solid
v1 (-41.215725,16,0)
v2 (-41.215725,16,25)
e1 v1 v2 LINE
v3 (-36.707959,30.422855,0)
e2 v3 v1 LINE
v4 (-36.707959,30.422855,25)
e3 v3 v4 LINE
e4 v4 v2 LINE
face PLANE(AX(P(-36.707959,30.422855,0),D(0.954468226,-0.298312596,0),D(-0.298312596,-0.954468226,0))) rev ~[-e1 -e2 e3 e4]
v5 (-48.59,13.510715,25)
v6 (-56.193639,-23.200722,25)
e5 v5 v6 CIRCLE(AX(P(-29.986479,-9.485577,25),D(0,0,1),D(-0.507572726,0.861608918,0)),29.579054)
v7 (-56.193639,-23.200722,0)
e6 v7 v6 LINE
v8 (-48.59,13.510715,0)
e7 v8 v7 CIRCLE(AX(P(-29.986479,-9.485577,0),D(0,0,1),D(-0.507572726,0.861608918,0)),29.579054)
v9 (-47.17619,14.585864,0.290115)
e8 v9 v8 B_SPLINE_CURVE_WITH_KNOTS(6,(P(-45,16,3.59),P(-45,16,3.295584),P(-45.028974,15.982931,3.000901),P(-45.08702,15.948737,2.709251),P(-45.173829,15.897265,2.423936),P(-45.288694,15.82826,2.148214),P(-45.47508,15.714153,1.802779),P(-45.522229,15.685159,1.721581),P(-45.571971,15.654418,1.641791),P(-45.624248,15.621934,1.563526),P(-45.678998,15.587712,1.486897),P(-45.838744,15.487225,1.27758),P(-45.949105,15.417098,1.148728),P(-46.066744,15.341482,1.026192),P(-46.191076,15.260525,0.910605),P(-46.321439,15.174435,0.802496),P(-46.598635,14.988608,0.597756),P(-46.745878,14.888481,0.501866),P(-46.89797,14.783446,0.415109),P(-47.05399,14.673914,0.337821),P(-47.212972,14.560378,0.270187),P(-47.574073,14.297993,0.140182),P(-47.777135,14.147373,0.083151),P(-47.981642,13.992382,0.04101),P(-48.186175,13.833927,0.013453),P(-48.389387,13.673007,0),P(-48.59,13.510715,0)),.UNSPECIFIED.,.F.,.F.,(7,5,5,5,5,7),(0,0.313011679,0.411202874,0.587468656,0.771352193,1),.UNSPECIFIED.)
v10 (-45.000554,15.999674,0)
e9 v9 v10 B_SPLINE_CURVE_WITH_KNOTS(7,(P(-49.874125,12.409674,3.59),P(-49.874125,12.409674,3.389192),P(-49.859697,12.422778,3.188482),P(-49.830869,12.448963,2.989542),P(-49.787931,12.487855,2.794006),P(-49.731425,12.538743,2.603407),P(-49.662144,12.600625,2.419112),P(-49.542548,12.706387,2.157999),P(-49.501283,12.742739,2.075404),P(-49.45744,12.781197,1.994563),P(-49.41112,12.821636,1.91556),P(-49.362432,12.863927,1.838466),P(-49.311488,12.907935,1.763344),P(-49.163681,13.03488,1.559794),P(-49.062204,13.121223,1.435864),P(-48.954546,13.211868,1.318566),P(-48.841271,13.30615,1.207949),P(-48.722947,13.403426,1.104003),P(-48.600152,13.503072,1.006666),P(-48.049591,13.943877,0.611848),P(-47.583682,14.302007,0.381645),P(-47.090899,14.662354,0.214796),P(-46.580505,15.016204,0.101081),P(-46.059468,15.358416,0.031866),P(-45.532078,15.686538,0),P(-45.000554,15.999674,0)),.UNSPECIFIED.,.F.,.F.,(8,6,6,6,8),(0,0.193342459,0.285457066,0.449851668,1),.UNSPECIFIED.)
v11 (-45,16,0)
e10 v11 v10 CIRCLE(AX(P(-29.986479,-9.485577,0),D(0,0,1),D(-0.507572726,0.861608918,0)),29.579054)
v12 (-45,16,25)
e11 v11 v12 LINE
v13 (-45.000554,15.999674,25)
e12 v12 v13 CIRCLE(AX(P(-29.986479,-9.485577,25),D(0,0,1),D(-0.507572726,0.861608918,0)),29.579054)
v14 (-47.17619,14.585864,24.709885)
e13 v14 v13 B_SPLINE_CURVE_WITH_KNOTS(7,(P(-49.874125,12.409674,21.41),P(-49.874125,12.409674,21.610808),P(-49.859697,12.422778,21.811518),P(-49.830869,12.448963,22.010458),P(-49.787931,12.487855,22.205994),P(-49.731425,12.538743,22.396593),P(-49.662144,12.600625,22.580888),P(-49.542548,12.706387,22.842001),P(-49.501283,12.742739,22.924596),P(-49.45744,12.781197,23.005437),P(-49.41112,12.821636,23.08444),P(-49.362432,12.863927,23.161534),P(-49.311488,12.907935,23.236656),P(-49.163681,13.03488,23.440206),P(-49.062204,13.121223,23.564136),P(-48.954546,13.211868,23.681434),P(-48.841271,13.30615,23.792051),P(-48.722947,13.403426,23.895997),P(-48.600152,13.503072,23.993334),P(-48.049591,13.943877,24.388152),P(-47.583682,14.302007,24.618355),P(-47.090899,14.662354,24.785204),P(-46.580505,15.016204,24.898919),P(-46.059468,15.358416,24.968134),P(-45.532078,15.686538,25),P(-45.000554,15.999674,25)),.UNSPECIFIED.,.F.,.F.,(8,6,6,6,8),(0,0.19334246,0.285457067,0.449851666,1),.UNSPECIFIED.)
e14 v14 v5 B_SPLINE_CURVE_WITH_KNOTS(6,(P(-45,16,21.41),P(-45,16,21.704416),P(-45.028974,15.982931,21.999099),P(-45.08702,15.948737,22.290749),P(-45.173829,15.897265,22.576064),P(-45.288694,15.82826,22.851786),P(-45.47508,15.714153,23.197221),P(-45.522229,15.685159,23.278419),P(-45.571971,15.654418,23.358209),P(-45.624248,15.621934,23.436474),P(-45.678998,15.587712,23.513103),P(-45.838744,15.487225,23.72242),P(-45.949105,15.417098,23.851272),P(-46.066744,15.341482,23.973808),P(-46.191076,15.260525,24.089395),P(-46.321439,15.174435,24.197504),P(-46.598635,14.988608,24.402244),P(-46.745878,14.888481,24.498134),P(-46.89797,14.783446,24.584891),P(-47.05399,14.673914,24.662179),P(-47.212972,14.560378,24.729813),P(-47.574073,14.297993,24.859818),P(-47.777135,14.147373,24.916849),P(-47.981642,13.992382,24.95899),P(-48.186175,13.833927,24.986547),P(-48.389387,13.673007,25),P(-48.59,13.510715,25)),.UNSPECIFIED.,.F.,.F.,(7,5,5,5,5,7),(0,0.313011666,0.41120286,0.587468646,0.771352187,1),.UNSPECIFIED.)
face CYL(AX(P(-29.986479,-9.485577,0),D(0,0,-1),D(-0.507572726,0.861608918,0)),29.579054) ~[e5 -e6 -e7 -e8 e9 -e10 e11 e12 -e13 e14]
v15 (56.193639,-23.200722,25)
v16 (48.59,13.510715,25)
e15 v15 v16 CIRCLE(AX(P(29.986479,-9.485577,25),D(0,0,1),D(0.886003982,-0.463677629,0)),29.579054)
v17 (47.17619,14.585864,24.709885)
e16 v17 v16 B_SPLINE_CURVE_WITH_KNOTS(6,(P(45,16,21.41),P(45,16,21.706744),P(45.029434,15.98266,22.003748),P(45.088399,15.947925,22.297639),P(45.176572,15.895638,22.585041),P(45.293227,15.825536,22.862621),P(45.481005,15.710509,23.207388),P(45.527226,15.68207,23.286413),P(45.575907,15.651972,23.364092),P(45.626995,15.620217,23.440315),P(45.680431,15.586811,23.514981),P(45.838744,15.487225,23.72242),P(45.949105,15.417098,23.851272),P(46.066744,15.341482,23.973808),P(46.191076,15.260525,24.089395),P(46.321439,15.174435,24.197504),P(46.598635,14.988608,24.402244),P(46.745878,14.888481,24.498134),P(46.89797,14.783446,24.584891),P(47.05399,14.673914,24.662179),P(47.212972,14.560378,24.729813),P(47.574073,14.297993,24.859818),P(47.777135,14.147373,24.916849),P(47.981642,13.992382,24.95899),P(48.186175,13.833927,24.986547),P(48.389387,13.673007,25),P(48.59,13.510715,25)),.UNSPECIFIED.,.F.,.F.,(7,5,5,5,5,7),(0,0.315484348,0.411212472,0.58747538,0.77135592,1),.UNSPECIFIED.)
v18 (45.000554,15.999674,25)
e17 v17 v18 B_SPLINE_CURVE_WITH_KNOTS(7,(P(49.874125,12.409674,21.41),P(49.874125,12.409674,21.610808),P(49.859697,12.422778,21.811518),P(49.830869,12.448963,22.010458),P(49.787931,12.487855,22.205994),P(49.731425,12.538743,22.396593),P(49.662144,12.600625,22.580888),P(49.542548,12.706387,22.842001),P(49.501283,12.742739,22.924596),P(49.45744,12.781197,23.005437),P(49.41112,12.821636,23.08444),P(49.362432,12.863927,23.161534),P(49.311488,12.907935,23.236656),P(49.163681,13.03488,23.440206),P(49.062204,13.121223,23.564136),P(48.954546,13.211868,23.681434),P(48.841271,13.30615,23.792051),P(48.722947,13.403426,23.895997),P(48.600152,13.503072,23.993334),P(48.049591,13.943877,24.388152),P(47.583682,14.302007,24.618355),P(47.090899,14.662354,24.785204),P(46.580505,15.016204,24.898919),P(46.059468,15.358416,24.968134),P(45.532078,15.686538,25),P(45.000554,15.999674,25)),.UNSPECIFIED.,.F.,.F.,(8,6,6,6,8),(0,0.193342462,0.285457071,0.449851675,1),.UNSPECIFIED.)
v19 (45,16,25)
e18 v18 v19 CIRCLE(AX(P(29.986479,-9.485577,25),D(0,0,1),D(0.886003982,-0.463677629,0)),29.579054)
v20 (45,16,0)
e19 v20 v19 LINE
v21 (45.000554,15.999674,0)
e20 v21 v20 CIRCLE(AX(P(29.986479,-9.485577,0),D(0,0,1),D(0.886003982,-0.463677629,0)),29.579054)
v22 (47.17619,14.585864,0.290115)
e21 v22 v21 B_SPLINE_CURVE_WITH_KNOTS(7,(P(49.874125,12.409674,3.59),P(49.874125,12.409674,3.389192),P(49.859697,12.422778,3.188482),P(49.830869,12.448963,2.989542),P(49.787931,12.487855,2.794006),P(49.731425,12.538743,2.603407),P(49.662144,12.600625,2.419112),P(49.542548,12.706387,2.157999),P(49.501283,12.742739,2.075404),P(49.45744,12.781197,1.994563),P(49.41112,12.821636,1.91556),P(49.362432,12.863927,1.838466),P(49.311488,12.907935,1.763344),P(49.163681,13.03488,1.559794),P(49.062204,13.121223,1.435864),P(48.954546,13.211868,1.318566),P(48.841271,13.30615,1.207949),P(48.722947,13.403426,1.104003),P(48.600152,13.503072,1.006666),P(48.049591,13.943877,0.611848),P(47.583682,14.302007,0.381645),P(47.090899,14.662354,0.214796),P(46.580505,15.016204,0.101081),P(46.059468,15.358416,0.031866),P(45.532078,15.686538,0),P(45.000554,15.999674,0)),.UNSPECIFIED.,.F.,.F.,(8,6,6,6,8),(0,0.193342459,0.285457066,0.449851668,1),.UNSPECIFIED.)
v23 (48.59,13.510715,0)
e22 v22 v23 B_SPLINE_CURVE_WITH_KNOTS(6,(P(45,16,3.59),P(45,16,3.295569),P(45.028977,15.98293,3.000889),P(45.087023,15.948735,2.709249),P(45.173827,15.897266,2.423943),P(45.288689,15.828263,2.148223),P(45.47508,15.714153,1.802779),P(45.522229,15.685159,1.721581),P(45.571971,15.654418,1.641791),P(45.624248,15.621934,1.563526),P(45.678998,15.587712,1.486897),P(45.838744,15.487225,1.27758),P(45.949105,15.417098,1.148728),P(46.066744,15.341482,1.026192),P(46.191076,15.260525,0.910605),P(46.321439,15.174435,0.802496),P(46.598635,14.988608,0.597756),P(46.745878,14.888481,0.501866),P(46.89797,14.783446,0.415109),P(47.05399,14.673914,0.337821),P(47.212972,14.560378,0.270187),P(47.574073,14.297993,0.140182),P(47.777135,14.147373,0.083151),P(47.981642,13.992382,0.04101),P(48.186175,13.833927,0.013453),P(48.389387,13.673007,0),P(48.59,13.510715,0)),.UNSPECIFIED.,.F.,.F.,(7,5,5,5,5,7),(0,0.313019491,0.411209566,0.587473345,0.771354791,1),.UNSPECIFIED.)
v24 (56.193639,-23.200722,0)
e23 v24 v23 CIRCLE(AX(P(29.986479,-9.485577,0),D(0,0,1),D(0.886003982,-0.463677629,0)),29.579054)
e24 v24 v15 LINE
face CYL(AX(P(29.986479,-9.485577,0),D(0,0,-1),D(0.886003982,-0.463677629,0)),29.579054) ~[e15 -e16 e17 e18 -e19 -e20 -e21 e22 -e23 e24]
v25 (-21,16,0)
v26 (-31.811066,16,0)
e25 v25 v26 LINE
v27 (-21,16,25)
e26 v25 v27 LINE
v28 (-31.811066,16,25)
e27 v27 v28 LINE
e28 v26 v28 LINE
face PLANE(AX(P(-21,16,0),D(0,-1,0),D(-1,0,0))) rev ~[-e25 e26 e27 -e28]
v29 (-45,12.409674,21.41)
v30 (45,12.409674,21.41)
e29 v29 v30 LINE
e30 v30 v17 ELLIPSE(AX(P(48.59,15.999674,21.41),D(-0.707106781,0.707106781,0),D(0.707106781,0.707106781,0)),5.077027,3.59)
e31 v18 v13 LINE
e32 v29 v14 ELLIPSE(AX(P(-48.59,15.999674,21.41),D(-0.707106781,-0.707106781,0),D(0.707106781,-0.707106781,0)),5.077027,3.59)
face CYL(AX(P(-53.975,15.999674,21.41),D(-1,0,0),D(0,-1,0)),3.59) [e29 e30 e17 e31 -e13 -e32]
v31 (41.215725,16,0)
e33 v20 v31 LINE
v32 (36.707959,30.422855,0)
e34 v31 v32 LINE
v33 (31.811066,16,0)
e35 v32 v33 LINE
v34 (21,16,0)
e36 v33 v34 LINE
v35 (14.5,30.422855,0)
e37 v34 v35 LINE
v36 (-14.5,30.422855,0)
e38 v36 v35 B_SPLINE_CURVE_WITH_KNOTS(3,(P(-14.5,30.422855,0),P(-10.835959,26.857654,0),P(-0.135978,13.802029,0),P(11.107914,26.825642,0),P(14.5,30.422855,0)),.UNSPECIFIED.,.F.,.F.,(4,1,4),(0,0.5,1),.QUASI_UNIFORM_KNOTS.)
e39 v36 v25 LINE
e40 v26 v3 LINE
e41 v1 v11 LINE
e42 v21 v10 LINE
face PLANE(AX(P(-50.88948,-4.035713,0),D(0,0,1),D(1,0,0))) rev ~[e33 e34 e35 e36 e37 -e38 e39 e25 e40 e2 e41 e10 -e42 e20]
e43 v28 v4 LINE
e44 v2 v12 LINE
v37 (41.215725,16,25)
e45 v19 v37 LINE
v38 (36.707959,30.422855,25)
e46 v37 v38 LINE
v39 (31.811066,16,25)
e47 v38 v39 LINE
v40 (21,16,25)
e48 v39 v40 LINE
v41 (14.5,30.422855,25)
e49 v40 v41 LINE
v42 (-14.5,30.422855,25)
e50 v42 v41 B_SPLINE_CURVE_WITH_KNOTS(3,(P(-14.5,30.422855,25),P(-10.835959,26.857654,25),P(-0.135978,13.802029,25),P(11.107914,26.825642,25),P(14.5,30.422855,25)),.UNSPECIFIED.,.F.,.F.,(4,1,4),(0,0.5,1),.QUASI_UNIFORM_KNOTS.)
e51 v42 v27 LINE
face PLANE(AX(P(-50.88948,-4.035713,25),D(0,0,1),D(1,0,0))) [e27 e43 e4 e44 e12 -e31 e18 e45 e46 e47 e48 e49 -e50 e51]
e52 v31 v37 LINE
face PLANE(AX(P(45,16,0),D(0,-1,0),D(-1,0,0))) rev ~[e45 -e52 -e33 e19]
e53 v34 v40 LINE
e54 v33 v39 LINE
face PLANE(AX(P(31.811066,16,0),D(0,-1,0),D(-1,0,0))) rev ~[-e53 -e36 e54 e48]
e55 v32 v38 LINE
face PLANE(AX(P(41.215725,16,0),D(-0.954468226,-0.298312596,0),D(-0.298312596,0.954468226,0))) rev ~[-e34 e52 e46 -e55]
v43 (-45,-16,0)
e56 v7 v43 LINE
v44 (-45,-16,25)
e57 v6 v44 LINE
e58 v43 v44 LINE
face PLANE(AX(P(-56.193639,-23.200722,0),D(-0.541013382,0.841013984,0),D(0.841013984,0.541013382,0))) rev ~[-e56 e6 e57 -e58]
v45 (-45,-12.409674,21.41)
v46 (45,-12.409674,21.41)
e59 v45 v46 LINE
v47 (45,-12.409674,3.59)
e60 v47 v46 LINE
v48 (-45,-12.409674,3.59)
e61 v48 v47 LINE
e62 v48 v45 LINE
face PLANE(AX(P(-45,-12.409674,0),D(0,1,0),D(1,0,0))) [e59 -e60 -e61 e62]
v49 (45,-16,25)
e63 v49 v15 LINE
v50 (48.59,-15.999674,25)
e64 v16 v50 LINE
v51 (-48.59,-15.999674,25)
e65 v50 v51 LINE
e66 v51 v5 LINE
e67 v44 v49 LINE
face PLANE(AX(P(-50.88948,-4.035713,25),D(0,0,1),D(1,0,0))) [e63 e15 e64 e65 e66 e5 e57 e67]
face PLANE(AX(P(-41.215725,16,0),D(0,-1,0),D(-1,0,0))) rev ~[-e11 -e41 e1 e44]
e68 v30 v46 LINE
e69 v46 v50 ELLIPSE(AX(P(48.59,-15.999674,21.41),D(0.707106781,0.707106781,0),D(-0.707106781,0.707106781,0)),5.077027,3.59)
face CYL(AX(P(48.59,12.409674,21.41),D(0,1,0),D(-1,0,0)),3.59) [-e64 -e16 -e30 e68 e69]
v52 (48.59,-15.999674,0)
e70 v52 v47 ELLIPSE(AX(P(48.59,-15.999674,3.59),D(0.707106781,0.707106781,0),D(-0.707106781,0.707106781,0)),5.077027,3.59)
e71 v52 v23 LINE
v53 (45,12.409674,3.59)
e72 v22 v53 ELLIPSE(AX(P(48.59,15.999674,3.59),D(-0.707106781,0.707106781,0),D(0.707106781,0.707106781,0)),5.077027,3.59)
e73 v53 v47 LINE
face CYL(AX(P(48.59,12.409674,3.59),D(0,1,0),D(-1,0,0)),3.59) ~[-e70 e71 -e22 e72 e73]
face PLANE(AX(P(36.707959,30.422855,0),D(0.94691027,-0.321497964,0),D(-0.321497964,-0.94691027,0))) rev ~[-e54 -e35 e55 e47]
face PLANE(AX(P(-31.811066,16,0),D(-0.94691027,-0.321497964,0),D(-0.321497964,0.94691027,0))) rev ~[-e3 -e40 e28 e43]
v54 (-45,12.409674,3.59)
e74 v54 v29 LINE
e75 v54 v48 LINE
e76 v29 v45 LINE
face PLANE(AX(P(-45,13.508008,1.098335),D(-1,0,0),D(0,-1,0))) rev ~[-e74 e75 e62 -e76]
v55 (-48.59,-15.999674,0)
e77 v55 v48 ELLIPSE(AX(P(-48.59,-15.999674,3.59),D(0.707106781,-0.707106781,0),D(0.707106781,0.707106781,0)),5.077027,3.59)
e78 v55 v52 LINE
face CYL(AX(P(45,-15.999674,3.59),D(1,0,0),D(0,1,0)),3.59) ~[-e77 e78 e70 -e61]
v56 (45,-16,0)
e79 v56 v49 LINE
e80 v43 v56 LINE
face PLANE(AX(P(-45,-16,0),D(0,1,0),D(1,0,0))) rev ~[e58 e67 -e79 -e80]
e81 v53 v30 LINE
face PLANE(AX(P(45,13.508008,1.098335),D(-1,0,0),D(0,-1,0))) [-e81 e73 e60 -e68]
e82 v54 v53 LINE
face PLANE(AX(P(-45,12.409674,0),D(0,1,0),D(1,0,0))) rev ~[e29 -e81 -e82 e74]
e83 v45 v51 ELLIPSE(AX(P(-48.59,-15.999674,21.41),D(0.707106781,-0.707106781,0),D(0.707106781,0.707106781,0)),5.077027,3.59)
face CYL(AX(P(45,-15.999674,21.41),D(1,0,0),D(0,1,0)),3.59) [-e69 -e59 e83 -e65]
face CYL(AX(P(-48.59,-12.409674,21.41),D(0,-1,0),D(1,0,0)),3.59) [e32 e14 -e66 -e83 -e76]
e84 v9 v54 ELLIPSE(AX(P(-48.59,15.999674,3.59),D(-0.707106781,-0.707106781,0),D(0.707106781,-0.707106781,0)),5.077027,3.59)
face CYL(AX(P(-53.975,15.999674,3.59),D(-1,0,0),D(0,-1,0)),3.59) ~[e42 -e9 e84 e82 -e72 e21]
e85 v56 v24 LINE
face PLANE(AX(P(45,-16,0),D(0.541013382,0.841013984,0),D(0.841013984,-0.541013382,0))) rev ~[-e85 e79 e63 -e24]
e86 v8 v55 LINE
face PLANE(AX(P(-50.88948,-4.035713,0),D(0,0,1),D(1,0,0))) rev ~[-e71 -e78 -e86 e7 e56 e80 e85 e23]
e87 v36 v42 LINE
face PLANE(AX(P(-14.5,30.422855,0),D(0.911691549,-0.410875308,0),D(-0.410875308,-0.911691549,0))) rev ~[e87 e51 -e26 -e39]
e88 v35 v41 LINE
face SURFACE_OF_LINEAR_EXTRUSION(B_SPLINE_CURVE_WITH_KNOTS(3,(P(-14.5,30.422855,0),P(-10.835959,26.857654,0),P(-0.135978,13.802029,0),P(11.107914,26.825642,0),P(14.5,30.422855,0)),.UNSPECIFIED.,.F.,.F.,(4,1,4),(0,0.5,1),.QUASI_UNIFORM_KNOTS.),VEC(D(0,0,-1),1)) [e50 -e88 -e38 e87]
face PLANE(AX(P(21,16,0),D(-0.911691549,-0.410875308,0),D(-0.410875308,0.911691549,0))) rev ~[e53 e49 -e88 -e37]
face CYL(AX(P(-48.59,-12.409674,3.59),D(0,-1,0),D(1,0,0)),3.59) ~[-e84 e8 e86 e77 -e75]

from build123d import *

# Parameters (mm, degrees)
F0_W          = 90
F0_H          = 3.590326354
F1_DEPTH      = 25
F2_T1_DEPTH   = 90
F2_T3_DEPTH   = 24.819347292
F2_T9_DEPTH   = 33.794347292
F2_S10_R      = 29.5790540859
F2_T11_DEPTH  = 19
F2_T15_DEPTH  = 98.975
F2_S16_R      = 29.5790540859
F2_T17_DEPTH  = 51
F2_T24_DEPTH  = 33.794347292
F2_S25_R      = 29.5790540859
F2_T26_DEPTH  = 19
F2_T30_DEPTH  = 98.975
F2_S31_R      = 29.5790540859
F2_T32_DEPTH  = 51
F2_T39_DEPTH  = 33.794347292
F2_S40_R      = 29.5790540859
F2_T41_DEPTH  = 19
F2_T45_DEPTH  = 98.975
F2_S46_R      = 29.5790540859
F2_T47_DEPTH  = 51
F2_T54_DEPTH  = 33.794347292
F2_S55_R      = 29.5790540859
F2_T56_DEPTH  = 19
F2_T60_DEPTH  = 98.975
F2_S61_R      = 29.5790540859
F2_T62_DEPTH  = 51
F2_T69_DEPTH  = 33.794347292
F2_T74_DEPTH  = 98.975
F2_T81_DEPTH  = 98.975
F2_T85_DEPTH  = 33.794347292
F2_T93_DEPTH  = 33.794347292
F2_T98_DEPTH  = 98.975
F2_T105_DEPTH = 98.975
F2_T109_DEPTH = 33.794347292


# Not quite as in the source:
# - a fillet or chamfer that OpenCascade refuses, or shapes differently, is made with other operations: its cross-section is extruded or revolved along the edge and cut away or added
# - a feature names something its author has since deleted; it is built from what else it names


with BuildPart() as f1:
    # F0 (on Top) → F1 (new body)
    with BuildSketch(Plane.XY):
        with BuildLine():
            Line((-56.193638593, -23.2007224411), (-45, -16))
            Line((-45, -16), (-45, -12.409673646))
            Line((-45, -12.409673646), (-45, 12.409673646))
            Line((-45, 12.409673646), (-45, 16))
            ThreePointArc((-45, 16), (-58.4287061492, -1.3639914429), (-56.193638593, -23.2007224411))
        make_face()
        with Locations((0, -14.204836823)):
            Rectangle(F0_W, F0_H)
        with BuildLine():
            Line((-21, 16), (21, 16))
            Line((21, 16), (14.5, 30.4228551942))
            add(Edge.make_bspline(
                [(-14.5, 30.4228551942), (-10.8359592966, 26.8576538948), (-0.1359775646, 13.802028979), (11.1079144259, 26.8256423781), (14.5, 30.4228551942)],
                knots=[0, 0, 0, 0, 0.5, 1, 1, 1, 1], degree=3))
            Line((-14.5, 30.4228551942), (-21, 16))
        make_face()
        with BuildLine():
            Line((45, -12.409673646), (45, -16))
            Line((45, -16), (56.193638593, -23.2007224411))
            ThreePointArc((56.193638593, -23.2007224411), (58.4287061492, -1.3639914429), (45, 16))
            Line((45, 16), (45, 12.409673646))
            Line((45, 12.409673646), (45, -12.409673646))
        make_face()
        Polygon((-36.7079592892, 30.4228551942), (-41.2157252431, 16), (-31.8110659719, 16), align=None)
        Polygon((31.8110659719, 16), (41.2157252431, 16), (36.7079592892, 30.4228551942), align=None)
        Polygon((-45, 12.409673646), (45, 12.409673646), (45, 16), (41.2157252431, 16), (31.8110659719, 16), (21, 16), (-21, 16), (-31.8110659719, 16), (-41.2157252431, 16), (-45, 16), align=None)
    extrude(amount=F1_DEPTH)

    # F2: fillet of radius 3.59 on 8 edges, made by hand

    # F2_s2 → F2_t1 (cut)
    with BuildSketch(Plane.YZ.offset(-45)):
        with BuildLine():
            ThreePointArc((12.409673646, 21.41), (13.4611603015, 23.9485133445), (15.999673646, 25))
            Line((15.999673646, 25), (12.409673646, 25))
            Line((12.409673646, 25), (12.409673646, 21.41))
        make_face()
        with BuildLine():
            ThreePointArc((12.409673646, 3.59), (13.4611603015, 1.0514866555), (15.999673646, 0))
            Line((15.999673646, 0), (12.409673646, 0))
            Line((12.409673646, 0), (12.409673646, 3.59))
        make_face()
        with BuildLine():
            ThreePointArc((-12.409673646, 3.59), (-13.4611603015, 1.0514866555), (-15.999673646, 0))
            Line((-15.999673646, 0), (-12.409673646, 0))
            Line((-12.409673646, 0), (-12.409673646, 3.59))
        make_face()
        with BuildLine():
            ThreePointArc((-12.409673646, 21.41), (-13.4611603015, 23.9485133445), (-15.999673646, 25))
            Line((-15.999673646, 25), (-12.409673646, 25))
            Line((-12.409673646, 25), (-12.409673646, 21.41))
        make_face()
    extrude(amount=F2_T1_DEPTH, mode=Mode.SUBTRACT)

    # F2_s4 → F2_t3 (cut)
    with BuildSketch(Plane.XZ.offset(-12.409673646)):
        with BuildLine():
            ThreePointArc((-45, 21.41), (-46.0514866555, 23.9485133445), (-48.59, 25))
            Line((-48.59, 25), (-45, 25))
            Line((-45, 25), (-45, 21.41))
        make_face()
        with BuildLine():
            ThreePointArc((-45, 3.59), (-46.0514866555, 1.0514866555), (-48.59, 0))
            Line((-48.59, 0), (-45, 0))
            Line((-45, 0), (-45, 3.59))
        make_face()
        with BuildLine():
            ThreePointArc((45, 21.41), (46.0514866555, 23.9485133445), (48.59, 25))
            Line((48.59, 25), (45, 25))
            Line((45, 25), (45, 21.41))
        make_face()
        with BuildLine():
            ThreePointArc((45, 3.59), (46.0514866555, 1.0514866555), (48.59, 0))
            Line((48.59, 0), (45, 0))
            Line((45, 0), (45, 3.59))
        make_face()
    extrude(amount=F2_T3_DEPTH, mode=Mode.SUBTRACT)


with BuildPart() as f2_tool7:
    # F2_s8 → F2_t9 (new body)
    with BuildSketch(Plane.XZ.offset(12.409673646)):
        with BuildLine():
            ThreePointArc((-45, 21.41), (-46.0514866555, 23.9485133445), (-48.59, 25))
            Line((-48.59, 25), (-45, 25))
            Line((-45, 25), (-45, 21.41))
        make_face()
    extrude(amount=-F2_T9_DEPTH)

    # F2_s10 → F2_t11 (intersect, symmetric)
    with BuildSketch(Plane.XY.offset(23.2)):
        with Locations((-29.9864788785, -9.4855767867)):
            Circle(F2_S10_R)
    extrude(amount=F2_T11_DEPTH, both=True, mode=Mode.INTERSECT)

    split(bisect_by=Plane.XZ.offset(-12.409673646), keep=Keep.BOTTOM)


with BuildPart() as f2_tool13:
    # F2_s14 → F2_t15 (new body)
    with BuildSketch(Plane.YZ.offset(-53.975)):
        with BuildLine():
            ThreePointArc((12.409673646, 21.41), (13.4611603015, 23.9485133445), (15.999673646, 25))
            Line((15.999673646, 25), (12.409673646, 25))
            Line((12.409673646, 25), (12.409673646, 21.41))
        make_face()
    extrude(amount=F2_T15_DEPTH)

    # F2_s16 → F2_t17 (intersect, symmetric)
    with BuildSketch(Plane.XY.offset(23.2)):
        with Locations((-29.9864788785, -9.4855767867)):
            Circle(F2_S16_R)
    extrude(amount=F2_T17_DEPTH, both=True, mode=Mode.INTERSECT)

    split(bisect_by=Plane.YZ.offset(-45), keep=Keep.BOTTOM)


with BuildPart() as f2_tool7_1:
    add(f2_tool7.part)

    # F2_t19: intersect F2_tool13
    add(f2_tool13.part, mode=Mode.INTERSECT)


with BuildPart() as f1_1:
    add(f1.part)

    # F2_t5: cut F2_tool7
    add(f2_tool7_1.part, mode=Mode.SUBTRACT)


with BuildPart() as f2_tool22:
    # F2_s23 → F2_t24 (new body)
    with BuildSketch(Plane.XZ.offset(-21.384673646)):
        with BuildLine():
            ThreePointArc((45, 21.41), (46.0514866555, 23.9485133445), (48.59, 25))
            Line((48.59, 25), (45, 25))
            Line((45, 25), (45, 21.41))
        make_face()
    extrude(amount=F2_T24_DEPTH)

    # F2_s25 → F2_t26 (intersect, symmetric)
    with BuildSketch(Plane.XY.offset(23.2)):
        with Locations((29.9864788785, -9.4855767867)):
            Circle(F2_S25_R)
    extrude(amount=F2_T26_DEPTH, both=True, mode=Mode.INTERSECT)

    split(bisect_by=Plane.XZ.offset(-12.409673646), keep=Keep.BOTTOM)


with BuildPart() as f2_tool28:
    # F2_s29 → F2_t30 (new body)
    with BuildSketch(Plane.YZ.offset(-45)):
        with BuildLine():
            ThreePointArc((12.409673646, 21.41), (13.4611603015, 23.9485133445), (15.999673646, 25))
            Line((15.999673646, 25), (12.409673646, 25))
            Line((12.409673646, 25), (12.409673646, 21.41))
        make_face()
    extrude(amount=F2_T30_DEPTH)

    # F2_s31 → F2_t32 (intersect, symmetric)
    with BuildSketch(Plane.XY.offset(23.2)):
        with Locations((29.9864788785, -9.4855767867)):
            Circle(F2_S31_R)
    extrude(amount=F2_T32_DEPTH, both=True, mode=Mode.INTERSECT)

    split(bisect_by=Plane.YZ.offset(45), keep=Keep.TOP)


with BuildPart() as f2_tool22_1:
    add(f2_tool22.part)

    # F2_t34: intersect F2_tool28
    add(f2_tool28.part, mode=Mode.INTERSECT)


with BuildPart() as f1_2:
    add(f1_1.part)

    # F2_t20: cut F2_tool22
    add(f2_tool22_1.part, mode=Mode.SUBTRACT)


with BuildPart() as f2_tool37:
    # F2_s38 → F2_t39 (new body)
    with BuildSketch(Plane.XZ.offset(12.409673646)):
        with BuildLine():
            ThreePointArc((-45, 3.59), (-46.0514866555, 1.0514866555), (-48.59, 0))
            Line((-48.59, 0), (-45, 0))
            Line((-45, 0), (-45, 3.59))
        make_face()
    extrude(amount=-F2_T39_DEPTH)

    # F2_s40 → F2_t41 (intersect, symmetric)
    with BuildSketch(Plane.XY.offset(1.8)):
        with Locations((-29.9864788785, -9.4855767867)):
            Circle(F2_S40_R)
    extrude(amount=F2_T41_DEPTH, both=True, mode=Mode.INTERSECT)

    split(bisect_by=Plane.XZ.offset(-12.409673646), keep=Keep.BOTTOM)


with BuildPart() as f2_tool43:
    # F2_s44 → F2_t45 (new body)
    with BuildSketch(Plane.YZ.offset(-53.975)):
        with BuildLine():
            ThreePointArc((12.409673646, 3.59), (13.4611603015, 1.0514866555), (15.999673646, 0))
            Line((15.999673646, 0), (12.409673646, 0))
            Line((12.409673646, 0), (12.409673646, 3.59))
        make_face()
    extrude(amount=F2_T45_DEPTH)

    # F2_s46 → F2_t47 (intersect, symmetric)
    with BuildSketch(Plane.XY.offset(1.8)):
        with Locations((-29.9864788785, -9.4855767867)):
            Circle(F2_S46_R)
    extrude(amount=F2_T47_DEPTH, both=True, mode=Mode.INTERSECT)

    split(bisect_by=Plane.YZ.offset(-45), keep=Keep.BOTTOM)


with BuildPart() as f2_tool37_1:
    add(f2_tool37.part)

    # F2_t49: intersect F2_tool43
    add(f2_tool43.part, mode=Mode.INTERSECT)


with BuildPart() as f1_3:
    add(f1_2.part)

    # F2_t35: cut F2_tool37
    add(f2_tool37_1.part, mode=Mode.SUBTRACT)


with BuildPart() as f2_tool52:
    # F2_s53 → F2_t54 (new body)
    with BuildSketch(Plane.XZ.offset(-21.384673646)):
        with BuildLine():
            ThreePointArc((45, 3.59), (46.0514866555, 1.0514866555), (48.59, 0))
            Line((48.59, 0), (45, 0))
            Line((45, 0), (45, 3.59))
        make_face()
    extrude(amount=F2_T54_DEPTH)

    # F2_s55 → F2_t56 (intersect, symmetric)
    with BuildSketch(Plane.XY.offset(1.8)):
        with Locations((29.9864788785, -9.4855767867)):
            Circle(F2_S55_R)
    extrude(amount=F2_T56_DEPTH, both=True, mode=Mode.INTERSECT)

    split(bisect_by=Plane.XZ.offset(-12.409673646), keep=Keep.BOTTOM)


with BuildPart() as f2_tool58:
    # F2_s59 → F2_t60 (new body)
    with BuildSketch(Plane.YZ.offset(-45)):
        with BuildLine():
            ThreePointArc((12.409673646, 3.59), (13.4611603015, 1.0514866555), (15.999673646, 0))
            Line((15.999673646, 0), (12.409673646, 0))
            Line((12.409673646, 0), (12.409673646, 3.59))
        make_face()
    extrude(amount=F2_T60_DEPTH)

    # F2_s61 → F2_t62 (intersect, symmetric)
    with BuildSketch(Plane.XY.offset(1.8)):
        with Locations((29.9864788785, -9.4855767867)):
            Circle(F2_S61_R)
    extrude(amount=F2_T62_DEPTH, both=True, mode=Mode.INTERSECT)

    split(bisect_by=Plane.YZ.offset(45), keep=Keep.TOP)


with BuildPart() as f2_tool52_1:
    add(f2_tool52.part)

    # F2_t64: intersect F2_tool58
    add(f2_tool58.part, mode=Mode.INTERSECT)


with BuildPart() as f1_4:
    add(f1_3.part)

    # F2_t50: cut F2_tool52
    add(f2_tool52_1.part, mode=Mode.SUBTRACT)


with BuildPart() as f2_tool67:
    # F2_s68 → F2_t69 (new body)
    with BuildSketch(Plane.XZ.offset(-12.409673646)):
        with BuildLine():
            ThreePointArc((45, 3.59), (46.0514866555, 1.0514866555), (48.59, 0))
            Line((48.59, 0), (45, 0))
            Line((45, 0), (45, 3.59))
        make_face()
    extrude(amount=F2_T69_DEPTH)

    split(bisect_by=Plane.XZ.offset(16), keep=Keep.BOTTOM)

    split(bisect_by=Plane.XZ.offset(12.409673646), keep=Keep.TOP)


with BuildPart() as f2_tool72:
    # F2_s73 → F2_t74 (new body)
    with BuildSketch(Plane.YZ.offset(53.975)):
        with BuildLine():
            ThreePointArc((-12.409673646, 3.59), (-13.4611603015, 1.0514866555), (-15.999673646, 0))
            Line((-15.999673646, 0), (-12.409673646, 0))
            Line((-12.409673646, 0), (-12.409673646, 3.59))
        make_face()
    extrude(amount=-F2_T74_DEPTH)

    split(bisect_by=Plane.YZ.offset(45), keep=Keep.TOP)


with BuildPart() as f2_tool67_1:
    add(f2_tool67.part)

    # F2_t76: intersect F2_tool72
    add(f2_tool72.part, mode=Mode.INTERSECT)


with BuildPart() as f1_5:
    add(f1_4.part)

    # F2_t65: cut F2_tool67
    add(f2_tool67_1.part, mode=Mode.SUBTRACT)


with BuildPart() as f2_tool79:
    # F2_s80 → F2_t81 (new body)
    with BuildSketch(Plane.YZ.offset(45)):
        with BuildLine():
            ThreePointArc((-12.409673646, 3.59), (-13.4611603015, 1.0514866555), (-15.999673646, 0))
            Line((-15.999673646, 0), (-12.409673646, 0))
            Line((-12.409673646, 0), (-12.409673646, 3.59))
        make_face()
    extrude(amount=-F2_T81_DEPTH)

    split(bisect_by=Plane.YZ.offset(-45), keep=Keep.BOTTOM)


with BuildPart() as f2_tool83:
    # F2_s84 → F2_t85 (new body)
    with BuildSketch(Plane.XZ.offset(21.384673646)):
        with BuildLine():
            ThreePointArc((-45, 3.59), (-46.0514866555, 1.0514866555), (-48.59, 0))
            Line((-48.59, 0), (-45, 0))
            Line((-45, 0), (-45, 3.59))
        make_face()
    extrude(amount=-F2_T85_DEPTH)

    split(bisect_by=Plane.XZ.offset(16), keep=Keep.BOTTOM)

    split(bisect_by=Plane.XZ.offset(12.409673646), keep=Keep.TOP)


with BuildPart() as f2_tool79_1:
    add(f2_tool79.part)

    # F2_t88: intersect F2_tool83
    add(f2_tool83.part, mode=Mode.INTERSECT)


with BuildPart() as f1_6:
    add(f1_5.part)

    # F2_t77: cut F2_tool79
    add(f2_tool79_1.part, mode=Mode.SUBTRACT)


with BuildPart() as f2_tool91:
    # F2_s92 → F2_t93 (new body)
    with BuildSketch(Plane.XZ.offset(-12.409673646)):
        with BuildLine():
            ThreePointArc((45, 21.41), (46.0514866555, 23.9485133445), (48.59, 25))
            Line((48.59, 25), (45, 25))
            Line((45, 25), (45, 21.41))
        make_face()
    extrude(amount=F2_T93_DEPTH)

    split(bisect_by=Plane.XZ.offset(16), keep=Keep.BOTTOM)

    split(bisect_by=Plane.XZ.offset(12.409673646), keep=Keep.TOP)


with BuildPart() as f2_tool96:
    # F2_s97 → F2_t98 (new body)
    with BuildSketch(Plane.YZ.offset(53.975)):
        with BuildLine():
            ThreePointArc((-12.409673646, 21.41), (-13.4611603015, 23.9485133445), (-15.999673646, 25))
            Line((-15.999673646, 25), (-12.409673646, 25))
            Line((-12.409673646, 25), (-12.409673646, 21.41))
        make_face()
    extrude(amount=-F2_T98_DEPTH)

    split(bisect_by=Plane.YZ.offset(45), keep=Keep.TOP)


with BuildPart() as f2_tool91_1:
    add(f2_tool91.part)

    # F2_t100: intersect F2_tool96
    add(f2_tool96.part, mode=Mode.INTERSECT)


with BuildPart() as f1_7:
    add(f1_6.part)

    # F2_t89: cut F2_tool91
    add(f2_tool91_1.part, mode=Mode.SUBTRACT)


with BuildPart() as f2_tool103:
    # F2_s104 → F2_t105 (new body)
    with BuildSketch(Plane.YZ.offset(45)):
        with BuildLine():
            ThreePointArc((-12.409673646, 21.41), (-13.4611603015, 23.9485133445), (-15.999673646, 25))
            Line((-15.999673646, 25), (-12.409673646, 25))
            Line((-12.409673646, 25), (-12.409673646, 21.41))
        make_face()
    extrude(amount=-F2_T105_DEPTH)

    split(bisect_by=Plane.YZ.offset(-45), keep=Keep.BOTTOM)


with BuildPart() as f2_tool107:
    # F2_s108 → F2_t109 (new body)
    with BuildSketch(Plane.XZ.offset(21.384673646)):
        with BuildLine():
            ThreePointArc((-45, 21.41), (-46.0514866555, 23.9485133445), (-48.59, 25))
            Line((-48.59, 25), (-45, 25))
            Line((-45, 25), (-45, 21.41))
        make_face()
    extrude(amount=-F2_T109_DEPTH)

    split(bisect_by=Plane.XZ.offset(16), keep=Keep.BOTTOM)

    split(bisect_by=Plane.XZ.offset(12.409673646), keep=Keep.TOP)


with BuildPart() as f2_tool103_1:
    add(f2_tool103.part)

    # F2_t112: intersect F2_tool107
    add(f2_tool107.part, mode=Mode.INTERSECT)


with BuildPart() as f1_8:
    add(f1_7.part)

    # F2_t101: cut F2_tool103
    add(f2_tool103_1.part, mode=Mode.SUBTRACT)


solid = f1_8.part
